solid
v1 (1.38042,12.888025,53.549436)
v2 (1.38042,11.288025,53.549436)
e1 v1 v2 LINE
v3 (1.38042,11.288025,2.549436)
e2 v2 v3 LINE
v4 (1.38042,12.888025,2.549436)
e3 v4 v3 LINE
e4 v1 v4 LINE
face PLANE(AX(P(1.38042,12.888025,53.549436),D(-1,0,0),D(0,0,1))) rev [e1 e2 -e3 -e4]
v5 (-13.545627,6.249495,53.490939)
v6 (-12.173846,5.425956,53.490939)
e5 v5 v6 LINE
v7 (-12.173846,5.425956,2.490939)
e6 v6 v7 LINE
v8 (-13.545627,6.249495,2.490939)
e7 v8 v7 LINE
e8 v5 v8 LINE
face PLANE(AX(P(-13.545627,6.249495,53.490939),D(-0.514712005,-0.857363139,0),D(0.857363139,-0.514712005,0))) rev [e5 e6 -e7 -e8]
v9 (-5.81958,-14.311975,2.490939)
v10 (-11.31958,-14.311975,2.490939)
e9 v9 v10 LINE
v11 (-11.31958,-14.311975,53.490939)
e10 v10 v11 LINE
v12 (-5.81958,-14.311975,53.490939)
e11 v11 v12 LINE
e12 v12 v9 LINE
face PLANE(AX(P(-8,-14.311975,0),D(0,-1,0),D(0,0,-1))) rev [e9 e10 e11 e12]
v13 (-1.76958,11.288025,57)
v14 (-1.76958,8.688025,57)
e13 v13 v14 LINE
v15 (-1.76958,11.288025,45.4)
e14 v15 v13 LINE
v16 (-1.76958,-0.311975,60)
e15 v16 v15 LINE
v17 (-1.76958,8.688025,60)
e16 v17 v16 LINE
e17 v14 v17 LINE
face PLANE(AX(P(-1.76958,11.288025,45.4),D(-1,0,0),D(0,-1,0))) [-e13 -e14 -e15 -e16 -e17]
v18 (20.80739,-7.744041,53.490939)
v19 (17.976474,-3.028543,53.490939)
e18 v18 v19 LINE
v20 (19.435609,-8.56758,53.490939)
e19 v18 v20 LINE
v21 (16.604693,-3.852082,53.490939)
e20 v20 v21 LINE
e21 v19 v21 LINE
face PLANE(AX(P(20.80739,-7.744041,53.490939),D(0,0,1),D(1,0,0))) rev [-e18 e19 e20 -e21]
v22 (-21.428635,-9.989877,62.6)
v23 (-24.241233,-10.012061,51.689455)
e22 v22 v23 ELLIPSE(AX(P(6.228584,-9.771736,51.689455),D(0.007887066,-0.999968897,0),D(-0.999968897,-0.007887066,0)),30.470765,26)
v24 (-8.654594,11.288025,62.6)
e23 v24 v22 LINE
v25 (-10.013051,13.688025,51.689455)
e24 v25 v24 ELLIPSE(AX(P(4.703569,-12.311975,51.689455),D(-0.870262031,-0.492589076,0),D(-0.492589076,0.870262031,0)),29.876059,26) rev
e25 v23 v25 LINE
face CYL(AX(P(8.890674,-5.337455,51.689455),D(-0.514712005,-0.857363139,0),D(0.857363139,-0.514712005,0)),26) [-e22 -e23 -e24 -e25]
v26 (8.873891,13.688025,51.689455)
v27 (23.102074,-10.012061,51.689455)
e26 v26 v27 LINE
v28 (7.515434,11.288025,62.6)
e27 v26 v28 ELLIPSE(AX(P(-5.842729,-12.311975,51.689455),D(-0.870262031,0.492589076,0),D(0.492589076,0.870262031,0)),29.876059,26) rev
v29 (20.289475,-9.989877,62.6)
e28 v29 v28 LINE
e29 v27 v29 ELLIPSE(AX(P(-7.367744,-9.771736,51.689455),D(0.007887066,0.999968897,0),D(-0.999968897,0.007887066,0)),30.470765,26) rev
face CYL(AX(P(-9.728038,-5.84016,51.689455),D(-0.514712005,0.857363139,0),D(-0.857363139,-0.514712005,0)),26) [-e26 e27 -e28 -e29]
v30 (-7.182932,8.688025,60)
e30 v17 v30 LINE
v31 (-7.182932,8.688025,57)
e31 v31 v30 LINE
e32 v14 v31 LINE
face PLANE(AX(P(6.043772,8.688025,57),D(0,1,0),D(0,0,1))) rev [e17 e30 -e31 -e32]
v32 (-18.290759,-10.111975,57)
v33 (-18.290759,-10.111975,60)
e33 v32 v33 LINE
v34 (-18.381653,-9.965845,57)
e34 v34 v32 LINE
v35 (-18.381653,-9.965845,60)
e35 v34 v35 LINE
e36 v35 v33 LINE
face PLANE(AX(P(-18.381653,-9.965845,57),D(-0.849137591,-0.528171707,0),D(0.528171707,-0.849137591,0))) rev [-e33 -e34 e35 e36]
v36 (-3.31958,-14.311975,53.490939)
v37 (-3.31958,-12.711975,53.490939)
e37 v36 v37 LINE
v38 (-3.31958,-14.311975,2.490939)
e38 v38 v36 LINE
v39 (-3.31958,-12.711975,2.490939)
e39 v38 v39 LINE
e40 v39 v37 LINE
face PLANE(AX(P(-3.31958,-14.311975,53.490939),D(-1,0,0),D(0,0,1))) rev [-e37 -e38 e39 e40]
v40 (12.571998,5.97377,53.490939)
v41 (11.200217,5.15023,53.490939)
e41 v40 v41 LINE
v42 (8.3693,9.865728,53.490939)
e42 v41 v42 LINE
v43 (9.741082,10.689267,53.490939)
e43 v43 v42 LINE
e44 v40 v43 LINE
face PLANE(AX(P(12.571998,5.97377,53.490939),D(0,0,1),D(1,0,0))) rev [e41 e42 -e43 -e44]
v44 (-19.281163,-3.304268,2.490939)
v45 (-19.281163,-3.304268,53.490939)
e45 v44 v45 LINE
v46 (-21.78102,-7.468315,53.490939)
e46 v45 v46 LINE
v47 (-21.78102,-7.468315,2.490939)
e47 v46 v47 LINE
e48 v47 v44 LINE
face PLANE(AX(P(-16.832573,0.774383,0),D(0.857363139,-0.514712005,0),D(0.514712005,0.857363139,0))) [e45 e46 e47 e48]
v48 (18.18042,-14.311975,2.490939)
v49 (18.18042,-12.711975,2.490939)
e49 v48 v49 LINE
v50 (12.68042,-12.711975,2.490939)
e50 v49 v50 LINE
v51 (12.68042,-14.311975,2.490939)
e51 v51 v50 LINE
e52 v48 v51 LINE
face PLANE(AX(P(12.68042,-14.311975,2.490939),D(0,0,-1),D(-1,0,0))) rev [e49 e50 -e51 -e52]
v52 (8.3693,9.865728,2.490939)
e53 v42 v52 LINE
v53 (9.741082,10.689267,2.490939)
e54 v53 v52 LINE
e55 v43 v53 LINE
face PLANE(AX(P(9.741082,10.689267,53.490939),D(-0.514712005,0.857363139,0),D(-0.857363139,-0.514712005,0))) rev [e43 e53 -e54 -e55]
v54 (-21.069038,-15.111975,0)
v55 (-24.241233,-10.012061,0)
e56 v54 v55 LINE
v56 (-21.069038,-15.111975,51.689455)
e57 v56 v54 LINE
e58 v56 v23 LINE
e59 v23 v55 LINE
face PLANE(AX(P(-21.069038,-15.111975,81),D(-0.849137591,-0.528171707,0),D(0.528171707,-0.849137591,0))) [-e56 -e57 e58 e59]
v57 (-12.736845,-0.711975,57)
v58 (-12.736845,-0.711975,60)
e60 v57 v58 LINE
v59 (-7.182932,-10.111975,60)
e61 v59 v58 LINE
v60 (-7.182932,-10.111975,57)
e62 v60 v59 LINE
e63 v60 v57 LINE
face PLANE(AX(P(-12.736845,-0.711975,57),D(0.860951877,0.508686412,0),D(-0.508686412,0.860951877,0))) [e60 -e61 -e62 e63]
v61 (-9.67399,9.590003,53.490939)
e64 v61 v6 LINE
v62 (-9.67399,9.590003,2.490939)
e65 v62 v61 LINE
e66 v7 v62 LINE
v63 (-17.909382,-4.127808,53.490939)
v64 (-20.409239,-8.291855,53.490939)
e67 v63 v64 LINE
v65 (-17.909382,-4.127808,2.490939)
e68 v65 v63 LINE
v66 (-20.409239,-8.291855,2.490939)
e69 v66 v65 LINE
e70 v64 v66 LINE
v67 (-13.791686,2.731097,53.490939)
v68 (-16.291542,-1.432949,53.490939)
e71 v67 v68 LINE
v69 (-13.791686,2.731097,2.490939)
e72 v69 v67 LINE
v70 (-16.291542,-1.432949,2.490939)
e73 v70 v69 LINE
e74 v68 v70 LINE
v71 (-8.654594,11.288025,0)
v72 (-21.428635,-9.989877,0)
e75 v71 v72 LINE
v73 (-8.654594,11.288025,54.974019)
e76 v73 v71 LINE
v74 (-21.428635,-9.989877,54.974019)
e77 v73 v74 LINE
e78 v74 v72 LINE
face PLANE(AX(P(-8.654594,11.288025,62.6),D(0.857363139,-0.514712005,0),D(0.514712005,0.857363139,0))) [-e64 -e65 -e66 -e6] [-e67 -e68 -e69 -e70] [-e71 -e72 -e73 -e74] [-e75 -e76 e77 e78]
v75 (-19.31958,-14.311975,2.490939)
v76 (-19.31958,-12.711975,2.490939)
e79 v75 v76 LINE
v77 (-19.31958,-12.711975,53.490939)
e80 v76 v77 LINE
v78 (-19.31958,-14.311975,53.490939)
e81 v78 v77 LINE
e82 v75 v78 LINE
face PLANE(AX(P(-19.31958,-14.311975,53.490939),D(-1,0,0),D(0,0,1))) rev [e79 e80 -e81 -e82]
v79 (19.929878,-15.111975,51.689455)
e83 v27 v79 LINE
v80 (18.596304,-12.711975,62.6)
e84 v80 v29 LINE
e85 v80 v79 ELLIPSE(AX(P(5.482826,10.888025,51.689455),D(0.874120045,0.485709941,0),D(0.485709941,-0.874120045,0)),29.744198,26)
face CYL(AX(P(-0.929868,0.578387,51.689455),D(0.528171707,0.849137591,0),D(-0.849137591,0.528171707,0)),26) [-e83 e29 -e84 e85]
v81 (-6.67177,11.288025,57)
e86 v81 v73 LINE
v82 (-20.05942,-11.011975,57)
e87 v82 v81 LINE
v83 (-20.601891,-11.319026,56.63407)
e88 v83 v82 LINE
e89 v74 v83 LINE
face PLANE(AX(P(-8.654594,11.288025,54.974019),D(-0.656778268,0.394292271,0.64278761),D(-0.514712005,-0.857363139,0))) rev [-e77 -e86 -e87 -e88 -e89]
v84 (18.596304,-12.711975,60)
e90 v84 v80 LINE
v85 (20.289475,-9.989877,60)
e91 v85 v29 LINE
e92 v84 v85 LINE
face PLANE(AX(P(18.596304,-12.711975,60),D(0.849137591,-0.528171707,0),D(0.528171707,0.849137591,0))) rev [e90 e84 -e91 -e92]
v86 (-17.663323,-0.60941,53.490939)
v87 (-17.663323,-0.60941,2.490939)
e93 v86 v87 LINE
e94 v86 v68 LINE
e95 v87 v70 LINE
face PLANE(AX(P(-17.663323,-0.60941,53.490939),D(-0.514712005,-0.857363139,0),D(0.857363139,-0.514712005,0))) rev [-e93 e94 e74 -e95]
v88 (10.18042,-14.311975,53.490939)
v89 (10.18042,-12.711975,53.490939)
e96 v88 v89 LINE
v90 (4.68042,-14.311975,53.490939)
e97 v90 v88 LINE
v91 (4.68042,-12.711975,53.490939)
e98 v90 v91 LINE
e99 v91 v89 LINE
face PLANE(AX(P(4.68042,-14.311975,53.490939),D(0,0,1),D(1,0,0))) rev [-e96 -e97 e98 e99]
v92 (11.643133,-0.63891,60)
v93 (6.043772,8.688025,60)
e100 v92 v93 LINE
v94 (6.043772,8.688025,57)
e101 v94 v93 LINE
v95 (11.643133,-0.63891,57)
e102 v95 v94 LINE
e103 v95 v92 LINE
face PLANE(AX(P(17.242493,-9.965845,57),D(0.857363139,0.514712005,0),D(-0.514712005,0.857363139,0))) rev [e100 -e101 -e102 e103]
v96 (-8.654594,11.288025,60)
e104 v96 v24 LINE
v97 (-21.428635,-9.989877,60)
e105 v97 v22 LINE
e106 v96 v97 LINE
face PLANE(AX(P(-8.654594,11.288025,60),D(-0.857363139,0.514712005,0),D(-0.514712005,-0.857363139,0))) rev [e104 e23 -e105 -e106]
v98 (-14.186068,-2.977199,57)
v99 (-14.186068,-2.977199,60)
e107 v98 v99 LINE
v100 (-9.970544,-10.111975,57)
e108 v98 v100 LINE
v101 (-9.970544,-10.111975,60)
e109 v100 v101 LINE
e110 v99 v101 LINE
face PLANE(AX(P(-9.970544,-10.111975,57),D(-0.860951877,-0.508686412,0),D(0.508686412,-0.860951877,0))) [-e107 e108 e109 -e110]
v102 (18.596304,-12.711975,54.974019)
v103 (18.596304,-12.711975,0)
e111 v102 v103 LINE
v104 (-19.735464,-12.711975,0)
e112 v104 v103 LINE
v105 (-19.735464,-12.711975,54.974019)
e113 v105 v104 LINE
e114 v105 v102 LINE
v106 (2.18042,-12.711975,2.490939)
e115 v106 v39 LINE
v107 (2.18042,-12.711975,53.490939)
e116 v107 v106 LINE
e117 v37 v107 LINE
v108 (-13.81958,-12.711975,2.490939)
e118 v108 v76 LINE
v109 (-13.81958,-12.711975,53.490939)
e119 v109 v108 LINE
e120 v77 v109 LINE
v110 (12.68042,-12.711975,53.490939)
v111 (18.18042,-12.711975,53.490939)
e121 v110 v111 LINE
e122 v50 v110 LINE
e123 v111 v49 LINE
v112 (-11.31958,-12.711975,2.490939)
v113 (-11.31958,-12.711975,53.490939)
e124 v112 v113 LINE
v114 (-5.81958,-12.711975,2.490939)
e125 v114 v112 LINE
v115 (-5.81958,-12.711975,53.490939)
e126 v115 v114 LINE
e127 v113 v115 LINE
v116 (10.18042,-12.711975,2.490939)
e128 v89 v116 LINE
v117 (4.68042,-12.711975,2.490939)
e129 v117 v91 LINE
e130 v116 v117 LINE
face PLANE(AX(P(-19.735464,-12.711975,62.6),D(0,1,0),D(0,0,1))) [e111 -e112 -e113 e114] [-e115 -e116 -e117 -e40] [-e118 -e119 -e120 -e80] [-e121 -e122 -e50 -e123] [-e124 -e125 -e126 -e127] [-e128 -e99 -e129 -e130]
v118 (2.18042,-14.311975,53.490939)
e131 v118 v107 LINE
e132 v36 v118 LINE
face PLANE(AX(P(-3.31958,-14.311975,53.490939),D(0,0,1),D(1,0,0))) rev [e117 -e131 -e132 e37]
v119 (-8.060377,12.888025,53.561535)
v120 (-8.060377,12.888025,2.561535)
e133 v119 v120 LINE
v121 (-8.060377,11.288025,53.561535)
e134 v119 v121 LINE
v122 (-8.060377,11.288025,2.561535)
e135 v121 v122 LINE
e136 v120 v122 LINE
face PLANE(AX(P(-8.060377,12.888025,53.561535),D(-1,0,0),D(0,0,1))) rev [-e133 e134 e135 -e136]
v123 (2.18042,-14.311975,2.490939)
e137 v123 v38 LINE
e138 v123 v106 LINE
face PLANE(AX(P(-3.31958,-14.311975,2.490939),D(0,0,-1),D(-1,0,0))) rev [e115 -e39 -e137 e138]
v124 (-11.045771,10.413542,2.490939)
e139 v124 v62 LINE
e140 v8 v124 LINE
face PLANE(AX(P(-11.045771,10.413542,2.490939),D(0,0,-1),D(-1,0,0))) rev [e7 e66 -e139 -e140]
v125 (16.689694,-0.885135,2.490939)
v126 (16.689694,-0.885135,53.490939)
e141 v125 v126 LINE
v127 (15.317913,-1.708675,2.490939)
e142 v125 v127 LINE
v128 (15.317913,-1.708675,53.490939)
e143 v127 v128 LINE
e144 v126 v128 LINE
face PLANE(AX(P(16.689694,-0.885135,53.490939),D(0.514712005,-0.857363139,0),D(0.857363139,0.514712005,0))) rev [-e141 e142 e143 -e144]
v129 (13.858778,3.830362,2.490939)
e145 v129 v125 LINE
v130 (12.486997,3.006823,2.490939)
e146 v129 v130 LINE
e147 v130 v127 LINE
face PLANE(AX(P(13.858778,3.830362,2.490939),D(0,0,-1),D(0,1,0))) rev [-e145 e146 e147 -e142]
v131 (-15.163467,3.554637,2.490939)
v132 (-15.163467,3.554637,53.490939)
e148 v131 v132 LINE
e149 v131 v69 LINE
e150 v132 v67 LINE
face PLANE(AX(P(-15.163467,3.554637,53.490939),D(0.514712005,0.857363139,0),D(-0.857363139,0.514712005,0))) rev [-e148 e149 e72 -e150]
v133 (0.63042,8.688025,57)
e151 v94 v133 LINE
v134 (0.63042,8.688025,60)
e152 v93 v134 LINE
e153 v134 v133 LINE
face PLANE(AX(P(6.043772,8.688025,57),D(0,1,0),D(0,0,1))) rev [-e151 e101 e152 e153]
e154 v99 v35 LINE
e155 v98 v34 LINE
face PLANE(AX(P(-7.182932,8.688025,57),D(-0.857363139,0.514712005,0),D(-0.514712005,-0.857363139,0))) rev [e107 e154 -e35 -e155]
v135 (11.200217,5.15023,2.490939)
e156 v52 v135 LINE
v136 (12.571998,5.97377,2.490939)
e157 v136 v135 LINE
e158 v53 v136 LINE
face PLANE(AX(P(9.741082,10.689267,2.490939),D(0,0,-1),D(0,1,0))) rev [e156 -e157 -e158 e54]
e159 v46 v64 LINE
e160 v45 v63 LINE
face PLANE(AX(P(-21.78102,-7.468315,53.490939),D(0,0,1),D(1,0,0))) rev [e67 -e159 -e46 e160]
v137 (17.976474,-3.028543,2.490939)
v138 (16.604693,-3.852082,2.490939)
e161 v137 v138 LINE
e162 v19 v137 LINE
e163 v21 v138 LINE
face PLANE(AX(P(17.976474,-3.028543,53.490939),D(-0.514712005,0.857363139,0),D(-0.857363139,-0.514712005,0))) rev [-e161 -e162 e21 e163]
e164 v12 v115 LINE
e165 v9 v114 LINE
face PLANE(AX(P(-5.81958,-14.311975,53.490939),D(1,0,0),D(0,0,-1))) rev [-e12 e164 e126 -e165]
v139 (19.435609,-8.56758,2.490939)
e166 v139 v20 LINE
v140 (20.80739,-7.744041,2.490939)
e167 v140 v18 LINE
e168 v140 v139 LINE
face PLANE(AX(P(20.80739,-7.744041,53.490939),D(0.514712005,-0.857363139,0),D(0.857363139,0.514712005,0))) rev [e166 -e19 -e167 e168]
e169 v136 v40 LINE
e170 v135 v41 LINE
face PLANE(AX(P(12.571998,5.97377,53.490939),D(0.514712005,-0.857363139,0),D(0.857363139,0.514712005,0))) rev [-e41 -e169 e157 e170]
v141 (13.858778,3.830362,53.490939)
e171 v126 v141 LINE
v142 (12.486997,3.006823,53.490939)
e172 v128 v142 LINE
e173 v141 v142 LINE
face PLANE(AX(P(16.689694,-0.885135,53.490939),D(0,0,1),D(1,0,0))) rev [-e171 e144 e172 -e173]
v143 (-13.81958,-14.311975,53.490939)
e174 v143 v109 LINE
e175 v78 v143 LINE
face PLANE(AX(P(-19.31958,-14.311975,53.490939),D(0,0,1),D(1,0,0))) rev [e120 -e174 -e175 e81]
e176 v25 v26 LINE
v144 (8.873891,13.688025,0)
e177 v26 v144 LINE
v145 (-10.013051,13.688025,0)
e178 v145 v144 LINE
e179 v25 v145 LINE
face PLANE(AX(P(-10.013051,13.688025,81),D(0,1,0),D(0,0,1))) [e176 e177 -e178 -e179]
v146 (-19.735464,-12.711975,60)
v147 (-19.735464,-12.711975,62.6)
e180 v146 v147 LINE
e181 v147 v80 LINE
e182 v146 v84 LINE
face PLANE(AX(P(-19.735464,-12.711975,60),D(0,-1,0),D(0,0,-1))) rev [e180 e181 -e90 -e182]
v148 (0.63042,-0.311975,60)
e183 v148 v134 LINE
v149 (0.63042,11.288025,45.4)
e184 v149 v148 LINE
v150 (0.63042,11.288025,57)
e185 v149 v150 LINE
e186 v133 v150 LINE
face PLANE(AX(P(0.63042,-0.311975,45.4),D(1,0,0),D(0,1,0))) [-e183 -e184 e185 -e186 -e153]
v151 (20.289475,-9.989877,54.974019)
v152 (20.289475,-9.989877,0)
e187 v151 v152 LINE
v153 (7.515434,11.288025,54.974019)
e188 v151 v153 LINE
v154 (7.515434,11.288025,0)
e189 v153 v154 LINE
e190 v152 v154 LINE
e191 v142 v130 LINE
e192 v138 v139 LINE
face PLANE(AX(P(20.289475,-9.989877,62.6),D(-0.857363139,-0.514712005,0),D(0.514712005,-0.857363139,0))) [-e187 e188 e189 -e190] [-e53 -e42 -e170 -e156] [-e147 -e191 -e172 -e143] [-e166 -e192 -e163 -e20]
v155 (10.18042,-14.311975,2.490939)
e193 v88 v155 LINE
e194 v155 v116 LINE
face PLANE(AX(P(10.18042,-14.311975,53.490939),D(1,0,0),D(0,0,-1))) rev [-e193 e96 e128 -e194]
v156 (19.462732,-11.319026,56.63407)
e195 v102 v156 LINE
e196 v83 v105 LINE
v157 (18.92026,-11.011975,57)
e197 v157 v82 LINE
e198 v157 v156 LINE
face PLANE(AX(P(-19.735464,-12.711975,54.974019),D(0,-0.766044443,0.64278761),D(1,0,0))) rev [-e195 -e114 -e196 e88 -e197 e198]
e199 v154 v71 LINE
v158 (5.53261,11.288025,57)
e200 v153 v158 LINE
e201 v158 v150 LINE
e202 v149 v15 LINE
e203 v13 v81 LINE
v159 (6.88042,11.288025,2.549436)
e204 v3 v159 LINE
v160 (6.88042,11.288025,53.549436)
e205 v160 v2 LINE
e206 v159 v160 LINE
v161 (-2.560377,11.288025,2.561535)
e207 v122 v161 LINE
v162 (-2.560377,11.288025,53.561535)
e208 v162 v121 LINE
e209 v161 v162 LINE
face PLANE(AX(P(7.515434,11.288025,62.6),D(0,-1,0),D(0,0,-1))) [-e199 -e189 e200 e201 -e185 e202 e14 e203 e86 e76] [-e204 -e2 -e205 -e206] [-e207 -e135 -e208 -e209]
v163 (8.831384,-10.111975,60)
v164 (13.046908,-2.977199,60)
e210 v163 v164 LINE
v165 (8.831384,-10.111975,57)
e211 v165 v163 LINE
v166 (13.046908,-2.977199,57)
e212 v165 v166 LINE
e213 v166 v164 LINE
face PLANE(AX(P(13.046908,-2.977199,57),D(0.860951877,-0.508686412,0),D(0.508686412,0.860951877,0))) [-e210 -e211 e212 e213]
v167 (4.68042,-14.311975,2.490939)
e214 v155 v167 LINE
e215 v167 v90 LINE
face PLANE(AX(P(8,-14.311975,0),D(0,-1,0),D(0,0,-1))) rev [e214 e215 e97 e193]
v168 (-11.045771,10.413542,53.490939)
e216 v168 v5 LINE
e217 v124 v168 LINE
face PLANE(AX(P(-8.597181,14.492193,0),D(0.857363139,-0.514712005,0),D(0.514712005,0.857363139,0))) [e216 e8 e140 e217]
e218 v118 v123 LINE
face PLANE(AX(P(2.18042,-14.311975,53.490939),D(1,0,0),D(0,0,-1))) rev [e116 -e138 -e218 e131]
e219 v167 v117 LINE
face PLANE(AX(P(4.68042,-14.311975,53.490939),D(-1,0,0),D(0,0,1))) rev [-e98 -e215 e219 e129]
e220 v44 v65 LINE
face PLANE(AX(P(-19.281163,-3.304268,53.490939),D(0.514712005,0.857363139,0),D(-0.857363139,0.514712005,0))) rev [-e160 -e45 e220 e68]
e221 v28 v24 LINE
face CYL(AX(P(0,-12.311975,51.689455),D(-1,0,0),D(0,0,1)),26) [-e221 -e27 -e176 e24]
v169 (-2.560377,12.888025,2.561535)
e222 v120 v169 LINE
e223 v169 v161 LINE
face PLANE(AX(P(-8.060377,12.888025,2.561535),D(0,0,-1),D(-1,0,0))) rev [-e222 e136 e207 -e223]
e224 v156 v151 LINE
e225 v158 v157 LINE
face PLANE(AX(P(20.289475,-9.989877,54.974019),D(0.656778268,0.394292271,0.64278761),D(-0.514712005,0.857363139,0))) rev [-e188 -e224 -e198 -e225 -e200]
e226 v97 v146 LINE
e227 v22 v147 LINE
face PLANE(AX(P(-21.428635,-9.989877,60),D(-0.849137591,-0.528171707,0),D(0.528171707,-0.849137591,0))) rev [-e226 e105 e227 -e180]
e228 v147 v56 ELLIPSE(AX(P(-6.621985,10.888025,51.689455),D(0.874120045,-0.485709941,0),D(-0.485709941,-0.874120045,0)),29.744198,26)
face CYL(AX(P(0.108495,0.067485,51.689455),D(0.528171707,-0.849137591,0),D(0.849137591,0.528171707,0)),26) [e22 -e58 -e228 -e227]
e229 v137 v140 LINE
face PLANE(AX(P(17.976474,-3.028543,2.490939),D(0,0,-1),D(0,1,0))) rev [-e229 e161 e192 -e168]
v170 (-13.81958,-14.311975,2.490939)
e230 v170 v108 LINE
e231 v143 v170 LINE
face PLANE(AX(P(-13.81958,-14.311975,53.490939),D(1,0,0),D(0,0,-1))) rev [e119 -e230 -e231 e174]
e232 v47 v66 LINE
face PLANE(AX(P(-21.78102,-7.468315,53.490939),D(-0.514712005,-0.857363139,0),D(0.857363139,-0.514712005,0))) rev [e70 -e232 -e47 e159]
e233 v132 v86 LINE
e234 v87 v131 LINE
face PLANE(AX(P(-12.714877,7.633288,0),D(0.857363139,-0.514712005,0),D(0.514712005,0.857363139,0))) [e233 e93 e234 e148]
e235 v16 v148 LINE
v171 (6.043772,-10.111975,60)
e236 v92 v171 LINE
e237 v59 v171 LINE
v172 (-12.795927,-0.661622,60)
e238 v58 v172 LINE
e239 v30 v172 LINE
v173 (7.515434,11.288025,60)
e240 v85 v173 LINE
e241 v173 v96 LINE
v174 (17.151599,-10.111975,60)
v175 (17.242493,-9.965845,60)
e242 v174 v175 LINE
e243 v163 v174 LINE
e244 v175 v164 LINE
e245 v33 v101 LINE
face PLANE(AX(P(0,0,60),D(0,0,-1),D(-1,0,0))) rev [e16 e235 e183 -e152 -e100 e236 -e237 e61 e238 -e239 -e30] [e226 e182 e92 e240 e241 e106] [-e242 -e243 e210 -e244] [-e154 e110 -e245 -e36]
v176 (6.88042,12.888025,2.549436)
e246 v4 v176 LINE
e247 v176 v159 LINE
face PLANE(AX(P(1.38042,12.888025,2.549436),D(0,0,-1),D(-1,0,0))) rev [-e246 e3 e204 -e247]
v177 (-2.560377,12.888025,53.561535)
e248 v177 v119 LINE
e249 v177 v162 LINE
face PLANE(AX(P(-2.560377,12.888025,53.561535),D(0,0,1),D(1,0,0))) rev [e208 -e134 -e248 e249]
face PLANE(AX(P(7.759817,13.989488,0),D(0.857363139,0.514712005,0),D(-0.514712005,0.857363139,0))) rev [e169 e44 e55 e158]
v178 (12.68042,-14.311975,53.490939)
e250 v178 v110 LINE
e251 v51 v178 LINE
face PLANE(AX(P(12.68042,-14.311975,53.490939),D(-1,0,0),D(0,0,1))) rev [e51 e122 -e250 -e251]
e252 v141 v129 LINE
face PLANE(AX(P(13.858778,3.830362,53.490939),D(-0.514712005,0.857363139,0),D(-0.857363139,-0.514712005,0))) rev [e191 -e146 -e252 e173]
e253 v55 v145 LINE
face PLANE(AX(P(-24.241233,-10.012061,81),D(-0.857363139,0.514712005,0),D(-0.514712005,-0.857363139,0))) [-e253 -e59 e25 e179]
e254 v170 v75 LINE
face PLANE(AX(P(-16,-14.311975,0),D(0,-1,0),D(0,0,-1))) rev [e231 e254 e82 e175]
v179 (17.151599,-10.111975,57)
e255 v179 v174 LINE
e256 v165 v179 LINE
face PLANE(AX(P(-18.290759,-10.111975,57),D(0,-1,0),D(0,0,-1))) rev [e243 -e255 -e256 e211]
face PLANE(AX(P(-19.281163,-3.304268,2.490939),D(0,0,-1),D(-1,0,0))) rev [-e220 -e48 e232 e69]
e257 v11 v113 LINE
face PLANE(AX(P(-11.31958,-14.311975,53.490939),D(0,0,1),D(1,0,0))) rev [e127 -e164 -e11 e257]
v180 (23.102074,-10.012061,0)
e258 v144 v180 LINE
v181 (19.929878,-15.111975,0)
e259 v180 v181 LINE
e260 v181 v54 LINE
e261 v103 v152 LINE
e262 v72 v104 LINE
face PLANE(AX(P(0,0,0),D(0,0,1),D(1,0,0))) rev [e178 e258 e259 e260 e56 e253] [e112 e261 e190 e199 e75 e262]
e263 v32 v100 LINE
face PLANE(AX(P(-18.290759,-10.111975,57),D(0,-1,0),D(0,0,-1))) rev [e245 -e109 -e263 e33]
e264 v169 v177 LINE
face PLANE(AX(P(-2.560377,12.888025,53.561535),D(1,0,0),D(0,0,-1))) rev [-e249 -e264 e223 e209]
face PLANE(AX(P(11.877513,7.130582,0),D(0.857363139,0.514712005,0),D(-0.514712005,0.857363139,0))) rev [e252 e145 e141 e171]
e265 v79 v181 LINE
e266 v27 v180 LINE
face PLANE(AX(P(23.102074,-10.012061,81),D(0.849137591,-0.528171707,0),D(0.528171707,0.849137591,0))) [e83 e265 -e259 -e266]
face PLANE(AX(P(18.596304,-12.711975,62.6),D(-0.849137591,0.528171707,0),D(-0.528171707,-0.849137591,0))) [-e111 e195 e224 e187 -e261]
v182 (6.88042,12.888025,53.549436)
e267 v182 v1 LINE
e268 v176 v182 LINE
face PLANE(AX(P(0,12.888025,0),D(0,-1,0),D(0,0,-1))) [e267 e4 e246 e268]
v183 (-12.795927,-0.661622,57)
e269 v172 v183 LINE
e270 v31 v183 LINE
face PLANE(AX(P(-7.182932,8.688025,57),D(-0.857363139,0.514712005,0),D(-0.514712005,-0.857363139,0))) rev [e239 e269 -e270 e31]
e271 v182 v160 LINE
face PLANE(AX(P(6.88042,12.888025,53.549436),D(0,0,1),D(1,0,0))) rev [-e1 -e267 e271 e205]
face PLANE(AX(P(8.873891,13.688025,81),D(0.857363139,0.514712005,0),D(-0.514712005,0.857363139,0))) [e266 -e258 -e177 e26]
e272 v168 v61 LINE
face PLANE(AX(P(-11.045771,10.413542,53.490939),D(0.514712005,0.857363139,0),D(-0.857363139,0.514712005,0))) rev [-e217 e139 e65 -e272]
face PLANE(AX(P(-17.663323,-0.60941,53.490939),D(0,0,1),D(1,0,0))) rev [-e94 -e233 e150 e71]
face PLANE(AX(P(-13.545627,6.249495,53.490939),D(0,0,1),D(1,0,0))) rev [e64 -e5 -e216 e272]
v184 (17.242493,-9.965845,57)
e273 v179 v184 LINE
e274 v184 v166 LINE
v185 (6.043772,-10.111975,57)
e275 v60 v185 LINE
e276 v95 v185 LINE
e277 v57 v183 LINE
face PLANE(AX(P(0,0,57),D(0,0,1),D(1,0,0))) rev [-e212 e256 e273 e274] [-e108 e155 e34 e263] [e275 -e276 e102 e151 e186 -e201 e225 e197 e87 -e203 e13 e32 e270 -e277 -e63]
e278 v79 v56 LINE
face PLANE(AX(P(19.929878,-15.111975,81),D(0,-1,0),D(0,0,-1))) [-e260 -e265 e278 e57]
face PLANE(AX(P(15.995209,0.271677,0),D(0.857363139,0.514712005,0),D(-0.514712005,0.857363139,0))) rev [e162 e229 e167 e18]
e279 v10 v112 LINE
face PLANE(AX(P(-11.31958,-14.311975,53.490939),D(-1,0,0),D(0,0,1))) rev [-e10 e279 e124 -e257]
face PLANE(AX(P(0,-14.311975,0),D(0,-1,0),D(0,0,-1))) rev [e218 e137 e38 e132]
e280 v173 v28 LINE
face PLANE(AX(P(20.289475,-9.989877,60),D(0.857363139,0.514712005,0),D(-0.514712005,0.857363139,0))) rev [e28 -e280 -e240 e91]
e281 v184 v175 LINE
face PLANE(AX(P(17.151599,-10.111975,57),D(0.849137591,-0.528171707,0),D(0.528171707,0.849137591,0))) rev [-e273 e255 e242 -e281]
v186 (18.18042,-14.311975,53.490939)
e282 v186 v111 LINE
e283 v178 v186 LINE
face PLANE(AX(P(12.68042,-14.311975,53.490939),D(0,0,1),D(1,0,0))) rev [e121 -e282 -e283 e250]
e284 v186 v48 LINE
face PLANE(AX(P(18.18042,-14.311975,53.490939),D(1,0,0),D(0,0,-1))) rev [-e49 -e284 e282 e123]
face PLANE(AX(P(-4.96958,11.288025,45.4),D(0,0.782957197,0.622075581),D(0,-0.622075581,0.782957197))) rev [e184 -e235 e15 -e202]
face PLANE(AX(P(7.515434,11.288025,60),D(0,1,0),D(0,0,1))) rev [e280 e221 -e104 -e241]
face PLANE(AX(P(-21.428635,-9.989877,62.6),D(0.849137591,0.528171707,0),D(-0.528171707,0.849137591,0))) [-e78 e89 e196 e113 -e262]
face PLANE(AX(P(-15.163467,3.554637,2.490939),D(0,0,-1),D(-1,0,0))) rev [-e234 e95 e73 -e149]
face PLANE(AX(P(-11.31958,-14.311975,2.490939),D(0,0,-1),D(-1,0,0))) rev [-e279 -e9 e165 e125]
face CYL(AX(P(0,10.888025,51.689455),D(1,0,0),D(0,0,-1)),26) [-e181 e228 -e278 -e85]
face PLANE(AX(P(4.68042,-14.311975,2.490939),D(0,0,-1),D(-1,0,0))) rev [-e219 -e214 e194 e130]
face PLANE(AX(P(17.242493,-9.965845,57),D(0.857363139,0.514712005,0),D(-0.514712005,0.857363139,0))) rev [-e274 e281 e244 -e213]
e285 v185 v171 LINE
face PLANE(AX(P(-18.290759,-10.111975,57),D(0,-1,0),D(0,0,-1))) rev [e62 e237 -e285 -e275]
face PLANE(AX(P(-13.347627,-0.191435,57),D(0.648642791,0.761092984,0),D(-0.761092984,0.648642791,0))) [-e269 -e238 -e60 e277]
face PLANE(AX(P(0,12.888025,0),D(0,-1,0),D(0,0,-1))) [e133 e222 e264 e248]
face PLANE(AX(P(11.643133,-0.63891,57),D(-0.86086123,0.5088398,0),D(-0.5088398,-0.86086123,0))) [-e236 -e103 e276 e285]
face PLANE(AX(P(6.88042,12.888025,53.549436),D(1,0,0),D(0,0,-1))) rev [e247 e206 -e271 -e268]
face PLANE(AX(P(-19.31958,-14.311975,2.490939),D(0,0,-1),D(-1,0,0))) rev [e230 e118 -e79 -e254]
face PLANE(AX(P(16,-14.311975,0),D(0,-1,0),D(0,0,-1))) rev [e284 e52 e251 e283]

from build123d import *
from OCP.BRepFilletAPI import BRepFilletAPI_MakeChamfer

# Parameters (mm, degrees)
BOSS_EXTRUDE1_DEPTH  = 62.6
BOSS_EXTRUDE2_DEPTH  = 5.6
CUT_EXTRUDE1_DEPTH   = 2.6
CHAMFER1_SIZE        = 5
CHAMFER1_SIZE_2      = 2.6
SKETCH7_W            = 2.4
SKETCH7_H            = 11.6
BOSS_EXTRUDE3_DEPTH  = 14.6
CUT_EXTRUDE2_DEPTH   = 5.6
BOSS_EXTRUDE11_DEPTH = 3
CUT_EXTRUDE3_DEPTH   = 81
FILLET1_R            = 26
SKETCH11_W           = 5.5
SKETCH11_H           = 51
CUT_EXTRUDE4_DEPTH   = 1.6
LPATTERN1_COUNT      = 3
LPATTERN1_PITCH      = 8
LPATTERN1_COL_COUNT  = 3
LPATTERN1_COL_PITCH  = 8
SKETCH12_W           = 51
SKETCH12_H           = 4.856806487
CUT_EXTRUDE5_DEPTH   = 1.6
LPATTERN2_COUNT      = 2
LPATTERN2_PITCH      = 8
LPATTERN2_COL_COUNT  = 2
LPATTERN2_COL_PITCH  = 8
SKETCH13_W           = 51
SKETCH13_H           = 5.5
CUT_EXTRUDE6_DEPTH   = 1.6
LPATTERN3_COUNT      = 2
LPATTERN3_PITCH      = 8
LPATTERN3_COL_COUNT  = 2
LPATTERN3_COL_PITCH  = 8
SKETCH14_W           = 5.5
SKETCH14_H           = 51
CUT_EXTRUDE7_DEPTH   = 1.6
CHAMFER2_SIZE        = 1.7
CHAMFER2_SIZE2       = 2.025981107
CHAMFER3_SIZE        = 1.7
CHAMFER3_SIZE2       = 2.025981107
CHAMFER4_SIZE        = 1.7
CHAMFER4_SIZE2       = 2.025981107


# Some blends are built 0.0001 mm under size
with BuildPart() as part:
    # Sketch1 → Boss-Extrude1 (new body)
    with BuildSketch(Plane.XY):
        Polygon((-24.475616366, -10.013909772), (-21.180169245, -15.311974759), (20.041009631, -15.311974759), (23.336456752, -10.013909772), (8.987096109, 13.888025241), (-10.126255723, 13.888025241), align=None)
        Polygon((-21.428634645, -9.989877279), (-19.735463964, -12.711974759), (18.59630435, -12.711974759), (20.289475031, -9.989877279), (7.515434067, 11.288025241), (-8.654593681, 11.288025241), align=None, mode=Mode.SUBTRACT)
    extrude(amount=BOSS_EXTRUDE1_DEPTH)

    # Sketch2 → Boss-Extrude2 (add)
    with BuildSketch(Plane.XY.offset(62.6)):
        Polygon((-8.654593681, 11.288025241), (-21.428634645, -9.989877279), (-19.735463964, -12.711974759), (18.59630435, -12.711974759), (20.289475031, -9.989877279), (7.515434067, 11.288025241), align=None)
        Polygon((-7.182931639, 8.688025241), (-18.381652924, -9.965844785), (-18.290758683, -10.111974759), (17.151599069, -10.111974759), (17.24249331, -9.965844785), (6.043772025, 8.688025241), align=None, mode=Mode.SUBTRACT)
    extrude(amount=-BOSS_EXTRUDE2_DEPTH)

    # Sketch4 → Cut-Extrude1 (cut)
    with BuildSketch(Plane.XY.offset(62.6)):
        Polygon((7.515434067, 11.288025241), (-8.654593681, 11.288025241), (-21.428634645, -9.989877279), (-19.735463964, -12.711974759), (18.59630435, -12.711974759), (20.289475031, -9.989877279), align=None)
        Polygon((6.043772025, 8.688025241), (-7.182931639, 8.688025241), (-18.381652924, -9.965844785), (-18.290758683, -10.111974759), (17.151599069, -10.111974759), (17.24249331, -9.965844785), align=None, mode=Mode.SUBTRACT)
    extrude(amount=-CUT_EXTRUDE1_DEPTH, mode=Mode.SUBTRACT)

    # Chamfer1
    chamfer1_edges_1 = [part.edges().sort_by_distance(p)[0] for p in [
        (-0.569579807, -15.311974759, 62.6),
    ]]
    chamfer1_side_1 = [part.faces().sort_by_distance(p)[0] for p in [
        (-0.569579807, -15.311974759, 62.548),
    ]]
    chamfer1_edges_2 = [part.edges().sort_by_distance(p)[0] for p in [
        (21.688733191, -12.662942265, 62.6),
    ]]
    chamfer1_side_2 = [part.faces().sort_by_distance(p)[0] for p in [
        (21.644578037, -12.635477337, 62.6),
    ]]
    chamfer1_edges_3 = [part.edges().sort_by_distance(p)[0] for p in [
        (16.16177643, 1.937057735, 62.6),
    ]]
    chamfer1_side_3 = [part.faces().sort_by_distance(p)[0] for p in [
        (16.117193547, 1.91029271, 62.6),
    ]]
    chamfer1_edges_4 = [part.edges().sort_by_distance(p)[0] for p in [
        (-0.569579807, 13.888025241, 62.6),
    ]]
    chamfer1_side_4 = [part.faces().sort_by_distance(p)[0] for p in [
        (-0.569579807, 13.836025241, 62.6),
    ]]
    chamfer1_edges_5 = [part.edges().sort_by_distance(p)[0] for p in [
        (-17.300936044, 1.937057735, 62.6),
    ]]
    chamfer1_side_5 = [part.faces().sort_by_distance(p)[0] for p in [
        (-17.300936044, 1.937057735, 62.548),
    ]]
    chamfer1_edges_6 = [part.edges().sort_by_distance(p)[0] for p in [
        (-22.827892805, -12.662942265, 62.6),
    ]]
    chamfer1_side_6 = [part.faces().sort_by_distance(p)[0] for p in [
        (-22.827892805, -12.662942265, 62.548),
    ]]
    chamfer1 = BRepFilletAPI_MakeChamfer(part.part.solid().wrapped)
    for e in chamfer1_edges_1:
        chamfer1.Add(CHAMFER1_SIZE - 0.0001, CHAMFER1_SIZE_2 - 0.0001, e.wrapped, chamfer1_side_1[0].wrapped)
    for e in chamfer1_edges_2:
        chamfer1.Add(CHAMFER1_SIZE_2 - 0.0001, CHAMFER1_SIZE - 0.0001, e.wrapped, chamfer1_side_2[0].wrapped)
    for e in chamfer1_edges_3:
        chamfer1.Add(CHAMFER1_SIZE_2 - 0.0001, CHAMFER1_SIZE - 0.0001, e.wrapped, chamfer1_side_3[0].wrapped)
    for e in chamfer1_edges_4:
        chamfer1.Add(CHAMFER1_SIZE_2 - 0.0001, CHAMFER1_SIZE - 0.0001, e.wrapped, chamfer1_side_4[0].wrapped)
    for e in chamfer1_edges_5:
        chamfer1.Add(CHAMFER1_SIZE - 0.0001, CHAMFER1_SIZE_2 - 0.0001, e.wrapped, chamfer1_side_5[0].wrapped)
    for e in chamfer1_edges_6:
        chamfer1.Add(CHAMFER1_SIZE - 0.0001, CHAMFER1_SIZE_2 - 0.0001, e.wrapped, chamfer1_side_6[0].wrapped)
    add(Compound.cast(chamfer1.Shape()), mode=Mode.REPLACE)  # a hair under: the kernel refuses the full size

    # Sketch7 → Boss-Extrude3 (add)
    with BuildSketch(Plane.XY.offset(60)):
        with Locations((-0.569579807, 5.488025241)):
            Rectangle(SKETCH7_W, SKETCH7_H)
    extrude(amount=-BOSS_EXTRUDE3_DEPTH)

    # Sketch8 → Cut-Extrude2 (cut)
    with BuildSketch(Plane(origin=(0.630420193, 0, 0), x_dir=(0, 0, -1), z_dir=(1, 0, 0))):
        Polygon((-45.4, -0.311974759), (-45.4, 11.288025241), (-60, -0.311974759), align=None)
    extrude(amount=-CUT_EXTRUDE2_DEPTH, mode=Mode.SUBTRACT)

    # Sketch9 → Boss-Extrude11 (add)
    with BuildSketch(Plane.XY.offset(60)):
        Polygon((13.046908424, -2.977199103), (8.831384276, -10.111974759), (9.211067566, -10.75458882), (5.807424218, -10.75458882), (6.043772025, -10.111974759), (11.643132668, -0.638909772), (11.902294033, -0.497125706), (13.714637927, -2.3094696), align=None)
        Polygon((-14.186068038, -2.977199103), (-14.822440578, -2.585111628), (-13.347627203, -0.191434724), (-12.736845161, -0.711974759), (-7.182931639, -10.111974759), (-6.628519955, -10.75458882), (-9.97054389, -10.75458882), (-9.97054389, -10.111974759), align=None)
    extrude(amount=-BOSS_EXTRUDE11_DEPTH)

    # Sketch10 → Cut-Extrude3 (cut)
    with BuildSketch(Plane(origin=(0, 0, 0), x_dir=(-1, 0, 0), z_dir=(0, 0, -1))):
        Polygon((24.475616366, -10.013909772), (10.126255723, 13.888025241), (-8.987096109, 13.888025241), (-23.336456752, -10.013909772), (-20.041009631, -15.311974759), (21.180169245, -15.311974759), align=None)
        Polygon((24.241233156, -10.012061119), (10.013050951, 13.688025241), (-8.873891337, 13.688025241), (-23.102073542, -10.012061119), (-19.929878455, -15.111974759), (21.069038069, -15.111974759), align=None, mode=Mode.SUBTRACT)
    extrude(amount=-CUT_EXTRUDE3_DEPTH, mode=Mode.SUBTRACT)

    # Fillet1
    # the kernel refuses this fillet: 26 mm, written as the material it takes off along each edge
    with BuildSketch(Plane(origin=(31.414243832, 3.351351117, 57.984722485), x_dir=(-0.39174625811116504, 0.24366992131316473, 0.8872202875854094), z_dir=(-0.5281717070926119, -0.8491375906335064, 0))) as fillet1_piece_1:
        with BuildLine():
            CenterArc((6.409899399, 25.971924525), FILLET1_R, 242.52600135, 24.811106356)
            Line((-5.585097434, 2.904197048), (-5.824997371, 2.442842498))
            Line((-5.824997371, 2.442842498), (-0.239899937, -0.46135455))
            Line((-0.239899937, -0.46135455), (0, -0.52))
            ThreePointArc((0, -0.52), (2.600976093, -0.52), (5.177793242, -0.51943849))
            Line((5.177793242, -0.51943849), (5.201952186, 0))
        make_face()
    extrude(amount=37.481249755, mode=Mode.SUBTRACT)
    with BuildSketch(Plane(origin=(-36.806666909, -15.111974759, 57.984722485), x_dir=(0, 0.46134603205930286, 0.8872202875854095), z_dir=(1, 0, 0))) as fillet1_piece_2:
        with BuildLine():
            CenterArc((6.409899399, -25.971924525), FILLET1_R, 92.662892294, 24.811106356)
            Line((-5.585097434, -2.904197048), (-5.824997371, -2.442842498))
            Line((-5.824997371, -2.442842498), (-0.239899937, 0.46135455))
            Line((-0.239899937, 0.46135455), (0, 0.52))
            ThreePointArc((0, 0.52), (2.600976093, 0.52), (5.177793242, 0.51943849))
            Line((5.177793242, 0.51943849), (5.201952186, 0))
        make_face()
    extrude(amount=72.474174205, mode=Mode.SUBTRACT)
    with BuildSketch(Plane(origin=(-32.553403446, 3.351351117, 57.984722485), x_dir=(0.39174625811116337, 0.24366992131316362, 0.8872202875854104), z_dir=(0.5281717070926113, -0.8491375906335067, 0))) as fillet1_piece_3:
        with BuildLine():
            CenterArc((6.409899399, -25.971924525), FILLET1_R, 92.662892294, 24.811106356)
            Line((-5.585097434, -2.904197048), (-5.824997371, -2.442842498))
            Line((-5.824997371, -2.442842498), (-0.239899937, 0.46135455))
            Line((-0.239899937, 0.46135455), (0, 0.52))
            ThreePointArc((0, 0.52), (2.600976093, 0.52), (5.177793242, 0.51943849))
            Line((5.177793242, 0.51943849), (5.201952186, 0))
        make_face()
    extrude(amount=37.481249755, mode=Mode.SUBTRACT)
    with BuildSketch(Plane(origin=(-1.912704463, 27.180888106, 57.984722485), x_dir=(0.39554108226314943, -0.2374603409813078, 0.8872202875854099), z_dir=(-0.5147120046125904, -0.8573631391118287, 0))) as fillet1_piece_4:
        with BuildLine():
            CenterArc((6.409899399, -25.971924525), FILLET1_R, 92.662892294, 24.811106356)
            Line((-5.585097434, -2.904197048), (-5.824997371, -2.442842498))
            Line((-5.824997371, -2.442842498), (-0.239899937, 0.46135455))
            Line((-0.239899937, 0.46135455), (0, 0.52))
            ThreePointArc((0, 0.52), (2.600976093, 0.52), (5.177793242, 0.51943849))
            Line((5.177793242, 0.51943849), (5.201952186, 0))
        make_face()
    extrude(amount=59.118254304, mode=Mode.SUBTRACT)
    with BuildSketch(Plane(origin=(-25.750679791, 13.688025241, 57.984722485), x_dir=(0, -0.4613460320593018, 0.88722028758541), z_dir=(1, 0, 0))) as fillet1_piece_5:
        with BuildLine():
            CenterArc((6.409899399, 25.971924525), FILLET1_R, 242.52600135, 24.811106356)
            Line((-5.585097434, 2.904197048), (-5.824997371, 2.442842498))
            Line((-5.824997371, 2.442842498), (-0.239899937, -0.46135455))
            Line((-0.239899937, -0.46135455), (0, -0.52))
            ThreePointArc((0, -0.52), (2.600976093, -0.52), (5.177793242, -0.51943849))
            Line((5.177793242, -0.51943849), (5.201952186, 0))
        make_face()
    extrude(amount=50.362199967, mode=Mode.SUBTRACT)
    with BuildSketch(Plane(origin=(0.773544849, 27.180888106, 57.984722485), x_dir=(-0.3955410822631513, -0.23746034098130891, 0.8872202875854089), z_dir=(0.5147120046125901, -0.8573631391118287, 0))) as fillet1_piece_6:
        with BuildLine():
            CenterArc((6.409899399, 25.971924525), FILLET1_R, 242.52600135, 24.811106356)
            Line((-5.585097434, 2.904197048), (-5.824997371, 2.442842498))
            Line((-5.824997371, 2.442842498), (-0.239899937, -0.46135455))
            Line((-0.239899937, -0.46135455), (0, -0.52))
            ThreePointArc((0, -0.52), (2.600976093, -0.52), (5.177793242, -0.51943849))
            Line((5.177793242, -0.51943849), (5.201952186, 0))
        make_face()
    extrude(amount=59.118254304, mode=Mode.SUBTRACT)

    # Sketch11 → Cut-Extrude4 (cut)
    with BuildSketch(Plane(origin=(0, -12.711974759, 0), x_dir=(1, 0, 0), z_dir=(0, 1, 0))):
        with Locations((-0.569579807, -27.99093939)):
            Rectangle(SKETCH11_W, SKETCH11_H)
    cut_extrude4 = extrude(amount=-CUT_EXTRUDE4_DEPTH, mode=Mode.SUBTRACT)

    # LPattern1: Cut-Extrude4 ×3
    with Locations(*[(i * LPATTERN1_PITCH, 0, 0) for i in range(1, LPATTERN1_COUNT)]):
        add(cut_extrude4, mode=Mode.SUBTRACT)

    # LPattern1 col: Cut-Extrude4 ×3
    with Locations(*[(-i * LPATTERN1_COL_PITCH, 0, 0) for i in range(1, LPATTERN1_COL_COUNT)]):
        add(cut_extrude4, mode=Mode.SUBTRACT)

    # Sketch12 → Cut-Extrude5 (cut)
    with BuildSketch(Plane(origin=(-11.34309584, 6.809748789, 0), x_dir=(0, 0, -1), z_dir=(0.8573631391118286, -0.5147120046125905, 0))):
        with Locations((-27.99093939, -7.185607273)):
            Rectangle(SKETCH12_W, SKETCH12_H)
    cut_extrude5 = extrude(amount=-CUT_EXTRUDE5_DEPTH, mode=Mode.SUBTRACT)

    # LPattern2: Cut-Extrude5 ×2
    with Locations(*[Vector(-0.5147120046125904, -0.8573631391118286, 0) * (i * LPATTERN2_PITCH) for i in range(1, LPATTERN2_COUNT)]):
        add(cut_extrude5, mode=Mode.SUBTRACT)

    # LPattern2 col: Cut-Extrude5 ×2
    with Locations(*[Vector(0.5147120046125906, 0.8573631391118286, 0) * (i * LPATTERN2_COL_PITCH) for i in range(1, LPATTERN2_COL_COUNT)]):
        add(cut_extrude5, mode=Mode.SUBTRACT)

    # Sketch13 → Cut-Extrude6 (cut)
    with BuildSketch(Plane(origin=(10.505732014, 6.307043233, 0), x_dir=(0, 0, 1), z_dir=(-0.8573631391118287, -0.5147120046125901, 0))):
        with Locations((27.99093939, -6.599268144)):
            Rectangle(SKETCH13_W, SKETCH13_H)
    cut_extrude6 = extrude(amount=-CUT_EXTRUDE6_DEPTH, mode=Mode.SUBTRACT)

    # LPattern3: Cut-Extrude6 ×2
    with Locations(*[Vector(0.5147120046125901, -0.8573631391118288, 0) * (i * LPATTERN3_PITCH) for i in range(1, LPATTERN3_COUNT)]):
        add(cut_extrude6, mode=Mode.SUBTRACT)

    # LPattern3 col: Cut-Extrude6 ×2
    with Locations(*[Vector(-0.5147120046125901, 0.8573631391118288, 0) * (i * LPATTERN3_COL_PITCH) for i in range(1, LPATTERN3_COL_COUNT)]):
        add(cut_extrude6, mode=Mode.SUBTRACT)

    # Sketch14 → Cut-Extrude7 (cut)
    with BuildSketch(Plane.XZ.offset(-11.288025241)):
        with Locations((4.130420193, 28.049435943)):
            Rectangle(SKETCH14_W, SKETCH14_H)
        with Locations((-5.310377128, 28.061535376)):
            Rectangle(SKETCH14_W, SKETCH14_H)
    extrude(amount=-CUT_EXTRUDE7_DEPTH, mode=Mode.SUBTRACT)

    # Chamfer2
    chamfer2_edges = [part.edges().sort_by_distance(p)[0] for p in [
        (-0.569579807, -12.711974759, 57),
    ]]
    chamfer2_side = [part.faces().sort_by_distance(p)[0] for p in [
        (-2.250869811, 9.988025241, 57),
    ]]
    chamfer(chamfer2_edges, length=CHAMFER2_SIZE, length2=CHAMFER2_SIZE2, reference=chamfer2_side[0])

    # Chamfer3
    chamfer3_edges = [part.edges().sort_by_distance(p)[0] for p in [
        (-15.041614163, 0.649073981, 57),
    ]]
    chamfer3_side = [part.faces().sort_by_distance(p)[0] for p in [
        (-20.709079395, -10.251078432, 57),
    ]]
    chamfer(chamfer3_edges, length=CHAMFER3_SIZE, length2=CHAMFER3_SIZE2, reference=chamfer3_side[0])

    # Chamfer4
    chamfer4_edges = [part.edges().sort_by_distance(p)[0] for p in [
        (13.902454549, 0.649073981, 57),
    ]]
    chamfer4_side = [part.faces().sort_by_distance(p)[0] for p in [
        (-0.202849696, -10.550962467, 57),
    ]]
    chamfer(chamfer4_edges, length=CHAMFER4_SIZE, length2=CHAMFER4_SIZE2, reference=chamfer4_side[0])


solid = part.part
